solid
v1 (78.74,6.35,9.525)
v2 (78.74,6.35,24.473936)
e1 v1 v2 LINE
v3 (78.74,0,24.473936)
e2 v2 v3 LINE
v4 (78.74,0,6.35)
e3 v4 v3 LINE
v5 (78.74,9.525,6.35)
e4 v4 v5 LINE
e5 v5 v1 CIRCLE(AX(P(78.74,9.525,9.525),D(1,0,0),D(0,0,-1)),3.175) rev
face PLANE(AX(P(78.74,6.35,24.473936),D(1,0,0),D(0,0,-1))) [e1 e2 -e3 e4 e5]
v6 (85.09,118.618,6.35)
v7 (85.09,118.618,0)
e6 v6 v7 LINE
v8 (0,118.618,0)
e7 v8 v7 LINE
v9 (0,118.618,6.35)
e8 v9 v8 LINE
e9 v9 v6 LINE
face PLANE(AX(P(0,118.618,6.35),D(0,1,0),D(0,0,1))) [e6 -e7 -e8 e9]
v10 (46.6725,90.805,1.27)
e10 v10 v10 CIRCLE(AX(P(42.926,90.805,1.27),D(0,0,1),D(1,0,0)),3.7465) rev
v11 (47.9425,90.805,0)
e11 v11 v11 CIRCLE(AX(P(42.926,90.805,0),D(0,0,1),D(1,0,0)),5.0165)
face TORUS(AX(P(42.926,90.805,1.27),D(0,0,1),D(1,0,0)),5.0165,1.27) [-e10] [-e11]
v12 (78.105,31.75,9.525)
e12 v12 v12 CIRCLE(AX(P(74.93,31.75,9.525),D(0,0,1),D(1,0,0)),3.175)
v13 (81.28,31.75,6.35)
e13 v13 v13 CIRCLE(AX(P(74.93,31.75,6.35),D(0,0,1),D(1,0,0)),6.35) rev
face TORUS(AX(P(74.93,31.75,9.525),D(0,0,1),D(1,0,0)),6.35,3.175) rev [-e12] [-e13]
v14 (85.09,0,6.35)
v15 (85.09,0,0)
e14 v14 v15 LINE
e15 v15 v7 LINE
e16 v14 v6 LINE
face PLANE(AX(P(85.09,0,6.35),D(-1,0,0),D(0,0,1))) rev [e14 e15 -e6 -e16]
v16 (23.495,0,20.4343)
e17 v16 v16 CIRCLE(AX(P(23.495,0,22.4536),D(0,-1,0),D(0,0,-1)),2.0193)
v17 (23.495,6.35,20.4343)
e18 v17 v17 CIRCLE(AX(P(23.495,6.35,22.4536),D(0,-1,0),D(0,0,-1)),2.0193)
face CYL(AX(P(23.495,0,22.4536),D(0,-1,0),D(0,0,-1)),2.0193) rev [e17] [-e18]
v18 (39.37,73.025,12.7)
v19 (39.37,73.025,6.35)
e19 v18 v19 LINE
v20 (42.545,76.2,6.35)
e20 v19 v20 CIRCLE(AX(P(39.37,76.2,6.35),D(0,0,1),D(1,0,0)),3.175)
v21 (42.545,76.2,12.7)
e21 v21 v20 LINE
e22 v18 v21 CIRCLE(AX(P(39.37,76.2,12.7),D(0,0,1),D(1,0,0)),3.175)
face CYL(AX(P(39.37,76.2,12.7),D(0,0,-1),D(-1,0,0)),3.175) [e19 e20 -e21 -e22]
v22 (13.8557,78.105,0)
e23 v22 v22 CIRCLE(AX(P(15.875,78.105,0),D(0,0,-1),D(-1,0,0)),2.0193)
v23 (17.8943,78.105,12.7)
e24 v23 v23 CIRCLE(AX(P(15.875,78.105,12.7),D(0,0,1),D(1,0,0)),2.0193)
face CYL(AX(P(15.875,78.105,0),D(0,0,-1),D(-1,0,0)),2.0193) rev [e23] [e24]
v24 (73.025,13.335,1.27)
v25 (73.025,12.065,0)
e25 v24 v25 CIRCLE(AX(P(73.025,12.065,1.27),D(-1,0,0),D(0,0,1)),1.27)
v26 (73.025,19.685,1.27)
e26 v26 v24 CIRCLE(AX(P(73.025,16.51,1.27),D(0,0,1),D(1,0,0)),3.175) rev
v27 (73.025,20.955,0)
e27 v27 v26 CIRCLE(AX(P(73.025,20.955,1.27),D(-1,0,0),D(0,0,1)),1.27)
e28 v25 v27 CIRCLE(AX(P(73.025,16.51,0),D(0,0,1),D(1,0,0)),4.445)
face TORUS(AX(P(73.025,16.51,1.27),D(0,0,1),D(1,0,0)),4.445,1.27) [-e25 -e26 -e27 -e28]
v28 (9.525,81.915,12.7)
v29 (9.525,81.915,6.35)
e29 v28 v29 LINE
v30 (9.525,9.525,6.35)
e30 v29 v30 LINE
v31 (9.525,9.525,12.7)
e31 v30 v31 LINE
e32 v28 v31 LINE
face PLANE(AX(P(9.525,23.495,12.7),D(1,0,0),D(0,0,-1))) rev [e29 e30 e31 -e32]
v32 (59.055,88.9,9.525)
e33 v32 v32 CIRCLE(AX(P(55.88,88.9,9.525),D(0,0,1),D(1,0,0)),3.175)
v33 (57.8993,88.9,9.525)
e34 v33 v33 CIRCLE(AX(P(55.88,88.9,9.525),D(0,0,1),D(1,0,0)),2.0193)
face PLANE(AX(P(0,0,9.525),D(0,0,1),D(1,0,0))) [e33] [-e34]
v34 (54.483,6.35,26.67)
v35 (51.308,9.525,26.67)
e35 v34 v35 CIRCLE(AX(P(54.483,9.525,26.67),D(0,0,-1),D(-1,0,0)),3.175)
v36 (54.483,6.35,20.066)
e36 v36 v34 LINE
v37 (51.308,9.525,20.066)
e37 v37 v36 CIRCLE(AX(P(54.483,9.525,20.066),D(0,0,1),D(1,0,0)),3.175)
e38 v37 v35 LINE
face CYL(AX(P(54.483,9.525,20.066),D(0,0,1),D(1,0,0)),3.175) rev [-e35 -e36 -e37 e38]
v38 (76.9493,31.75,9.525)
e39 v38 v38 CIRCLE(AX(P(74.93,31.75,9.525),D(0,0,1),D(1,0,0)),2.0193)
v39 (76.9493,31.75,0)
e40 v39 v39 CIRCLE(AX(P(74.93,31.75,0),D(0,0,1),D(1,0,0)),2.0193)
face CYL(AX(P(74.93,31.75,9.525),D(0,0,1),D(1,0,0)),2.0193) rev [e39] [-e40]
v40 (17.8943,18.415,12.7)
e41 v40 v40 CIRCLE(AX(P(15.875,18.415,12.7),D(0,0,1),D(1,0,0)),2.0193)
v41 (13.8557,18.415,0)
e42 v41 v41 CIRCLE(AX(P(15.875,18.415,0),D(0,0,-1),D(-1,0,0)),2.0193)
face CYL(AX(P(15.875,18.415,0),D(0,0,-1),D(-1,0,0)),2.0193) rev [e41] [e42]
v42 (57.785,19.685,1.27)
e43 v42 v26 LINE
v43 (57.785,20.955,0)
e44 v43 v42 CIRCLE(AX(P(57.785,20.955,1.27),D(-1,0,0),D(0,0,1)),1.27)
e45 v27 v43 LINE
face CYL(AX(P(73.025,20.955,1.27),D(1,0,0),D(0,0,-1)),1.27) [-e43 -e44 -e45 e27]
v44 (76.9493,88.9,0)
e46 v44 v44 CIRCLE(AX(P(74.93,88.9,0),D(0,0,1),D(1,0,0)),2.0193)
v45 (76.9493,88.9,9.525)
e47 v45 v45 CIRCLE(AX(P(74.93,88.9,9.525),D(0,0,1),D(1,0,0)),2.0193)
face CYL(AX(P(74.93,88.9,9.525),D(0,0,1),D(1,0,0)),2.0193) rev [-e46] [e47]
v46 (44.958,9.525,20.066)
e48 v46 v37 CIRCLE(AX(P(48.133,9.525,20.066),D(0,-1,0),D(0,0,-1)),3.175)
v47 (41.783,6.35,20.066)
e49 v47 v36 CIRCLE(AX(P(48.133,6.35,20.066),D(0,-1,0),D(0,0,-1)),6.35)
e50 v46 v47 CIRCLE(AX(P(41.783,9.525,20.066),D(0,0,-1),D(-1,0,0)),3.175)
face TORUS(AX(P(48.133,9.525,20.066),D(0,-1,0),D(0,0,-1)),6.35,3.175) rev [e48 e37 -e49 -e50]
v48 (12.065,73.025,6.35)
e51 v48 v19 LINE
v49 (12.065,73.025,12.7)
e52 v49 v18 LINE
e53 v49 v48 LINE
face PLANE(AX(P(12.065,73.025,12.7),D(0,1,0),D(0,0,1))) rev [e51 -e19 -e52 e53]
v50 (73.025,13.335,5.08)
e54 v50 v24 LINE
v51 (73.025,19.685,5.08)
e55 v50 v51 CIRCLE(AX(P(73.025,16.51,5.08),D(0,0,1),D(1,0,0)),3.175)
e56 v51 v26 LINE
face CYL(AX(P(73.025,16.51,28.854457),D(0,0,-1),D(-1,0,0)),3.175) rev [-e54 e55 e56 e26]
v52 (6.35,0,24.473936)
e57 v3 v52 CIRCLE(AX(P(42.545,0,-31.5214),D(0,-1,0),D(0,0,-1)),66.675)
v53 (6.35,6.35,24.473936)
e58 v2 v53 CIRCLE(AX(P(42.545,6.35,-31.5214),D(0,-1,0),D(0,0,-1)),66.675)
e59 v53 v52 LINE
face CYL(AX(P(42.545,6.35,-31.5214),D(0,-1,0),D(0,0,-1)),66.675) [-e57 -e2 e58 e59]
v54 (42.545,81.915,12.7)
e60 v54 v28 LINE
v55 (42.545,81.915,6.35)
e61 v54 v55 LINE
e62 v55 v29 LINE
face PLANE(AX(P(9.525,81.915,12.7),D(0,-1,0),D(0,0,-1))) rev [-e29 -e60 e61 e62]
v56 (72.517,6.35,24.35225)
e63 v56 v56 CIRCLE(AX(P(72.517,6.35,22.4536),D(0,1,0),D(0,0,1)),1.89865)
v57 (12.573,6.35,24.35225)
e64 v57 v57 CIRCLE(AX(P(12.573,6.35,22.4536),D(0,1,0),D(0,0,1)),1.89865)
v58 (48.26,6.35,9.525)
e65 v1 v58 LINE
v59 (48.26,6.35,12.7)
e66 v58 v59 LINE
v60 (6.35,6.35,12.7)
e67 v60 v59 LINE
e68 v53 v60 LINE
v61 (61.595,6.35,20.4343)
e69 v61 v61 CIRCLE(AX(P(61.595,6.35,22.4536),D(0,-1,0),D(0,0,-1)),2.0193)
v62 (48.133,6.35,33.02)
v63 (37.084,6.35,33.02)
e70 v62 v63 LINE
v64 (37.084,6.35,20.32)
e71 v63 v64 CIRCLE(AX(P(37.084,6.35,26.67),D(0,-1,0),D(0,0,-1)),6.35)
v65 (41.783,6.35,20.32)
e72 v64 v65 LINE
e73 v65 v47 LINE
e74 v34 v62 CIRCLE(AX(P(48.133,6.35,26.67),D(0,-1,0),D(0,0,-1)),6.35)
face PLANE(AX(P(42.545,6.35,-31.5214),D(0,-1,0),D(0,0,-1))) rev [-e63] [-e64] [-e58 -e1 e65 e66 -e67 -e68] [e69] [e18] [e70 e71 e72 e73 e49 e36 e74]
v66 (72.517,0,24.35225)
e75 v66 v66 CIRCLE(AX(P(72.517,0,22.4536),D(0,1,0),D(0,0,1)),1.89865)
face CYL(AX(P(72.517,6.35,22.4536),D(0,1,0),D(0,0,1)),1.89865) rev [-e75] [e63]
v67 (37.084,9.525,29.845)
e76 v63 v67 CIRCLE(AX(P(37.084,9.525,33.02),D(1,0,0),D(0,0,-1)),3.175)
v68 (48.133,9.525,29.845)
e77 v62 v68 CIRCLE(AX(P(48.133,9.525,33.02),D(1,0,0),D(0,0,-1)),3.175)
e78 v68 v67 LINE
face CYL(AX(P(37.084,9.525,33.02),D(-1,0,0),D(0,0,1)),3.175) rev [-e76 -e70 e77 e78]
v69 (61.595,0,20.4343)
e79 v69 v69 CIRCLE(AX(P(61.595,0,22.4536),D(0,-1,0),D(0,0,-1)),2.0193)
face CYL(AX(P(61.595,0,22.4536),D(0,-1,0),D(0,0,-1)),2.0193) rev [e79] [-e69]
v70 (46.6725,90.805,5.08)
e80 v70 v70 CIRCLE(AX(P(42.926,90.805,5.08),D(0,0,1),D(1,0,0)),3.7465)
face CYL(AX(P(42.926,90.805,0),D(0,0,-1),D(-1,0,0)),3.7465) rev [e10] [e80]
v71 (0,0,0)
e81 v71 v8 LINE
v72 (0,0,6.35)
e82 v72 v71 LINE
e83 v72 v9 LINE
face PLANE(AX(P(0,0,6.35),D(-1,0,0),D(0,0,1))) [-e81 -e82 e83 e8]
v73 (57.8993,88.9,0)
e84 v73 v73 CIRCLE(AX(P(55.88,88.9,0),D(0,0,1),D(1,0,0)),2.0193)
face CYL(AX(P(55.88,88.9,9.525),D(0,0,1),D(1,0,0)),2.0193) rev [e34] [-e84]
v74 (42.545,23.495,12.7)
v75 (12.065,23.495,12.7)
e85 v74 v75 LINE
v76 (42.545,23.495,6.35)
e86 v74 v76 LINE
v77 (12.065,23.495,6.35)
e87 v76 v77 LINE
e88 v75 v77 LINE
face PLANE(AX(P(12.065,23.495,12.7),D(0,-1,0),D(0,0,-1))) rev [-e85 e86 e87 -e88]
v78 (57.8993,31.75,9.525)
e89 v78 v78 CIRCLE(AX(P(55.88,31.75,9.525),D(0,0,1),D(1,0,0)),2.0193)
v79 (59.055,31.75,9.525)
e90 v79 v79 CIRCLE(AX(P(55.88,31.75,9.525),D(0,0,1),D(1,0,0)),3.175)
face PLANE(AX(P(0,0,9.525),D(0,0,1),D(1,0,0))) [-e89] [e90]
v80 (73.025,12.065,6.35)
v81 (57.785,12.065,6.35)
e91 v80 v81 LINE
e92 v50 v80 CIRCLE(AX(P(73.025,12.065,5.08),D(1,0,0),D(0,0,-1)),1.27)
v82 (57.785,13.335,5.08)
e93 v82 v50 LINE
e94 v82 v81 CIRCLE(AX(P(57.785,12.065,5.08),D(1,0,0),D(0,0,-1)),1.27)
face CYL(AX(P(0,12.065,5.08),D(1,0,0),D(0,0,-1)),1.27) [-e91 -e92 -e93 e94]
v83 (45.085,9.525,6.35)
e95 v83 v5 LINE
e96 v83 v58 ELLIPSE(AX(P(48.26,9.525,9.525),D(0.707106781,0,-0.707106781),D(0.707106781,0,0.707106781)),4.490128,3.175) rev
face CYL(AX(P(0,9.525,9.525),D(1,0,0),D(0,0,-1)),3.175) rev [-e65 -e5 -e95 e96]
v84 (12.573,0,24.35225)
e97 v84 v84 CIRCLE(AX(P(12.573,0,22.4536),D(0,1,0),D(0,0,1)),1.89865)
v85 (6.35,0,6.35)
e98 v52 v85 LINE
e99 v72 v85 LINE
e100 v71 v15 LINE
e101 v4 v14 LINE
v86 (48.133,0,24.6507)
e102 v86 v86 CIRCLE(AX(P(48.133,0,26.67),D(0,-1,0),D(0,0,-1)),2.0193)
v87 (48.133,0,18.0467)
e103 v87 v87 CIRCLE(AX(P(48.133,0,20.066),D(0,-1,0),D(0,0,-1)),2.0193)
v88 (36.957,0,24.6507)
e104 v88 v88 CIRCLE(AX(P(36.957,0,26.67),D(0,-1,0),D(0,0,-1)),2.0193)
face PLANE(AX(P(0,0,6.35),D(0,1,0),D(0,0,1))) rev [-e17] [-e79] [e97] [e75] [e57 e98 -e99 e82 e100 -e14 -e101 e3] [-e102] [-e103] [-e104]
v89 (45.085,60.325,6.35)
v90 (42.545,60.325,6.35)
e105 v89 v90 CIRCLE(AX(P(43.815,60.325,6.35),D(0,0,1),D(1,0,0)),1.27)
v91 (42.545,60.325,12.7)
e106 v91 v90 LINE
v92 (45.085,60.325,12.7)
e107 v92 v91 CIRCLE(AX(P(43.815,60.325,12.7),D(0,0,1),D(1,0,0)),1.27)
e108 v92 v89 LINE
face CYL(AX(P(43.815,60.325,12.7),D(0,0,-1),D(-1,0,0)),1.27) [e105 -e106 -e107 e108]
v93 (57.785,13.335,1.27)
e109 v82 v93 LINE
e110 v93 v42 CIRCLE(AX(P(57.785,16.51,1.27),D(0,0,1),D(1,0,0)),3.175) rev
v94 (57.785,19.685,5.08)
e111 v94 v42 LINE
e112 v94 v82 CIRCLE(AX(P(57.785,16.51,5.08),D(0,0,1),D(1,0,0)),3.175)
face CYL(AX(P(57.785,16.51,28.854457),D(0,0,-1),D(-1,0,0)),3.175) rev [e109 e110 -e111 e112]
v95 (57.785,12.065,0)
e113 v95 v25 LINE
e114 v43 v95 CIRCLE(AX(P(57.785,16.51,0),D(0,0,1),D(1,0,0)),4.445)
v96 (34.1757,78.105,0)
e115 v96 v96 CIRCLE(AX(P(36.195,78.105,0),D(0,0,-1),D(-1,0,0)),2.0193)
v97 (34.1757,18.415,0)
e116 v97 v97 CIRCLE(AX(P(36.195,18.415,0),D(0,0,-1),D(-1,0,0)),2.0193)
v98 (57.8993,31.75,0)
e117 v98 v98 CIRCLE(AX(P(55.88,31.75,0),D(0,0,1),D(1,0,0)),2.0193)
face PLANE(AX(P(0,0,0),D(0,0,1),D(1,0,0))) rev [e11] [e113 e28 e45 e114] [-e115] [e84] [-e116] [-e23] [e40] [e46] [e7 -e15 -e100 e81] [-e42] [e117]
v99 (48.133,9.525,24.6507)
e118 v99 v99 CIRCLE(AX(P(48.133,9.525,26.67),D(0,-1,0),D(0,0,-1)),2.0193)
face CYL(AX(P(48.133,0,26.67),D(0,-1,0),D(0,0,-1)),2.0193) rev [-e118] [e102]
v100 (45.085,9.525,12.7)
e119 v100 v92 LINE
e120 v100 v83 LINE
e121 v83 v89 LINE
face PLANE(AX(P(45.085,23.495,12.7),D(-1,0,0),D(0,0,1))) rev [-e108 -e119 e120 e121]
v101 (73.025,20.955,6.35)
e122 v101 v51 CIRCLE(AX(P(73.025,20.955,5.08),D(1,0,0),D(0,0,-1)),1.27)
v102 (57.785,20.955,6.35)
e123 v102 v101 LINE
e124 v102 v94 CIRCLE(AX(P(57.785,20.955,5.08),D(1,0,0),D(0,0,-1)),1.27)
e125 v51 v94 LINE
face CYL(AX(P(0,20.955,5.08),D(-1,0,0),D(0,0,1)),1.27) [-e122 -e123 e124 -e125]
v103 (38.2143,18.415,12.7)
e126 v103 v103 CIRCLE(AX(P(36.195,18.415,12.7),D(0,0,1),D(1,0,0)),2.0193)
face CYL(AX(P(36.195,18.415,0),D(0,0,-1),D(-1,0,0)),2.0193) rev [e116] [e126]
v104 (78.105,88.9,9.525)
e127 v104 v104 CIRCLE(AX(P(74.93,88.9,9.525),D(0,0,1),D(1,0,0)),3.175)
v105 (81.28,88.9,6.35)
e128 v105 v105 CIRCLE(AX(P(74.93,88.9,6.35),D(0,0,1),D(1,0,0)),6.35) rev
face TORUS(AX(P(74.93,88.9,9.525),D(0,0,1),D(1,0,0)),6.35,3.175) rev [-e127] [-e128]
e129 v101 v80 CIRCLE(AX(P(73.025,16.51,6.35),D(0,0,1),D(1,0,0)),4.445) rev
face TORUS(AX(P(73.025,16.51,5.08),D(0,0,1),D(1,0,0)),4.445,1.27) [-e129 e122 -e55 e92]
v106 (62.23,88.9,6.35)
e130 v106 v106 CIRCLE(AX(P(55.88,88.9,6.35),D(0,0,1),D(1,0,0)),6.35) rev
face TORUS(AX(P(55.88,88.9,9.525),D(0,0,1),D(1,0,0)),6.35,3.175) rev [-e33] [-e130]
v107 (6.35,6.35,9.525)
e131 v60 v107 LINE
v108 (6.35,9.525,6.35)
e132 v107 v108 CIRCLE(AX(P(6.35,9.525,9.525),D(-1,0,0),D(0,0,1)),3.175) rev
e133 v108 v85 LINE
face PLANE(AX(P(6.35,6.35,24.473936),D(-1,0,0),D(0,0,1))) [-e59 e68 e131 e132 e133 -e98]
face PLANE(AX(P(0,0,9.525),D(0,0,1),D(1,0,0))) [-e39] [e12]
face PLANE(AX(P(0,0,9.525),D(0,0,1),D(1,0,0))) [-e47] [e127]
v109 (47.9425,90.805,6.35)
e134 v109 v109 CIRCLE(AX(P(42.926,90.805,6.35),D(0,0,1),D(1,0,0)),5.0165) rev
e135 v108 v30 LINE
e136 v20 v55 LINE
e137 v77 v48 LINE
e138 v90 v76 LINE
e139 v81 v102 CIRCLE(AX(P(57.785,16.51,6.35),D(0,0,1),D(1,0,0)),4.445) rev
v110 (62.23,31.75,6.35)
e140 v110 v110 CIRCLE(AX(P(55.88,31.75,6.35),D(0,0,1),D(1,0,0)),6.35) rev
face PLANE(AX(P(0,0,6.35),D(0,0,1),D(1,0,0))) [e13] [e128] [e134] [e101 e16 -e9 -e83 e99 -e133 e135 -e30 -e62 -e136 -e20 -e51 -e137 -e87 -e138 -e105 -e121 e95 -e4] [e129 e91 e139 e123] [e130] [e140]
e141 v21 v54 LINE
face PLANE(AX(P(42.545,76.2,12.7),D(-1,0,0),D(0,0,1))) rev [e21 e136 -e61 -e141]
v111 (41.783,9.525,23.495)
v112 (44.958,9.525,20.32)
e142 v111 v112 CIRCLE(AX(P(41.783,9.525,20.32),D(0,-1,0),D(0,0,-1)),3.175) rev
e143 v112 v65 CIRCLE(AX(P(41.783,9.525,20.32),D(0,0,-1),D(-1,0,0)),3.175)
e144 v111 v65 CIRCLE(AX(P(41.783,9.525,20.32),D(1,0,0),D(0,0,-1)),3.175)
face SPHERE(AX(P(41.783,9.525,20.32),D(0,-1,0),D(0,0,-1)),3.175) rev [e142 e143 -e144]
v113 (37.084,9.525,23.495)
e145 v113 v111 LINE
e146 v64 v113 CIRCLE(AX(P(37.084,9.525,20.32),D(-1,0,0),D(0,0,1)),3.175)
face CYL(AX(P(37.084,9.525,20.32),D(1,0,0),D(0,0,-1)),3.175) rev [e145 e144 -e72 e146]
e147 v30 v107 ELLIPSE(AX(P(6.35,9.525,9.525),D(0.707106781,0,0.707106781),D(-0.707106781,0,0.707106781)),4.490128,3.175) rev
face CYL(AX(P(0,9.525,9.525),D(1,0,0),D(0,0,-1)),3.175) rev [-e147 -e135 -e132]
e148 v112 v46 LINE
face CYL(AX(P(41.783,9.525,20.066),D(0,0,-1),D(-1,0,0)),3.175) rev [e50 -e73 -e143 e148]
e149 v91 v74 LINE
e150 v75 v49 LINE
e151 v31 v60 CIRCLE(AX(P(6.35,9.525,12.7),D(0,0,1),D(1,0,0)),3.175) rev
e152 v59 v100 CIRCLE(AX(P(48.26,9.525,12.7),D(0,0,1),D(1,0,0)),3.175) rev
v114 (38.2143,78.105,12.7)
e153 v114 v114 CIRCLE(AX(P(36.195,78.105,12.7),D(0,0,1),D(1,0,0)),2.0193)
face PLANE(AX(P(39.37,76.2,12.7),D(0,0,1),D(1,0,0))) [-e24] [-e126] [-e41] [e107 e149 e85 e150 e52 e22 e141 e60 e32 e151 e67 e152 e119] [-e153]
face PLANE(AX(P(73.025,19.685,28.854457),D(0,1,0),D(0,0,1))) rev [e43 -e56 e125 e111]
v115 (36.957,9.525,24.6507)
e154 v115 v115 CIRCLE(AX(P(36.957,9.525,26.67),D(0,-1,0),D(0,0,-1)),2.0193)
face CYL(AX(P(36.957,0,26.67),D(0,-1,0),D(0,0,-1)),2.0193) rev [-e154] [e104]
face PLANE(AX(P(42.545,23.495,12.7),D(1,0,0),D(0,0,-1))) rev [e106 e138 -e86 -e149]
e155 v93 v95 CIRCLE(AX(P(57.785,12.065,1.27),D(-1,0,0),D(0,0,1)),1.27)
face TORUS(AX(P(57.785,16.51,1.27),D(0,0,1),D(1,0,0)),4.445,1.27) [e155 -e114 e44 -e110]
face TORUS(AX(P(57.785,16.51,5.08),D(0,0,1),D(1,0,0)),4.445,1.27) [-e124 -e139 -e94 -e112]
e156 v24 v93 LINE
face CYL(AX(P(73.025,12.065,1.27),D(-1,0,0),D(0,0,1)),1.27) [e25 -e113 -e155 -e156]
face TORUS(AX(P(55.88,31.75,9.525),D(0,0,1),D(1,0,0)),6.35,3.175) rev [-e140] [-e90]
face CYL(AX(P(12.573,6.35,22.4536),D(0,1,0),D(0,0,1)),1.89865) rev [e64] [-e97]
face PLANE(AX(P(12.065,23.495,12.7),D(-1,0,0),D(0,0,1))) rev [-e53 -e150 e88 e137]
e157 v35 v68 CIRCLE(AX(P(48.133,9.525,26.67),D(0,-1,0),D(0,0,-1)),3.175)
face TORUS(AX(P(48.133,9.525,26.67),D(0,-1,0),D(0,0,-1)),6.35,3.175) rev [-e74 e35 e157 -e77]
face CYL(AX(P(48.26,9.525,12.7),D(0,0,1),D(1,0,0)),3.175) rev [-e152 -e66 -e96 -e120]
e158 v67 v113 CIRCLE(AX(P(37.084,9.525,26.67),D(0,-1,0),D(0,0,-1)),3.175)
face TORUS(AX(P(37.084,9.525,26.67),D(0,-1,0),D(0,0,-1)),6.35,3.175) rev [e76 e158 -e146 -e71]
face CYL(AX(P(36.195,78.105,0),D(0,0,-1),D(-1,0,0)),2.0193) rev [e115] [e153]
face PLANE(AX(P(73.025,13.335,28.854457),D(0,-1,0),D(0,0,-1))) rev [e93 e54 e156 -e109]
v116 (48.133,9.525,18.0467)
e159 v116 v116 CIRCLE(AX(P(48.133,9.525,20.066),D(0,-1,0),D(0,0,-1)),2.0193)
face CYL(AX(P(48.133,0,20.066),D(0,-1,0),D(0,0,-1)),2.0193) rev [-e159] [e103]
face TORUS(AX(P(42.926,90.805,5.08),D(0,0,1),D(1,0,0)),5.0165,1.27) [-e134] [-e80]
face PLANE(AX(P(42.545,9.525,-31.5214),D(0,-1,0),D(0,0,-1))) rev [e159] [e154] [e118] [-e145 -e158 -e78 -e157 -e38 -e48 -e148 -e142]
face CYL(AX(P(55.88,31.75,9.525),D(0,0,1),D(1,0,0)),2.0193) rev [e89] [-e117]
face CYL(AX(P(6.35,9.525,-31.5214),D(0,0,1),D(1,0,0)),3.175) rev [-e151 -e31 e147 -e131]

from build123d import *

# Parameters (mm, degrees)
SKETCH1_W                         = 85.09
SKETCH1_H                         = 118.618
BOSS1_MAIN_PLATE_DEPTH            = 6.35
BOSS2_BOTTOM_PLATE_DEPTH          = 6.35
BOSS3_BATTERY_PLATE_DEPTH         = 6.35
FILLET1_BOTTOM_PLATE_R            = 3.175
HOLES1_CB_MAIN_PLATE_D            = 4.0386
HOLES2_MAIN_PLATE_D               = 7.493
CUT1_MAIN_PLATE_DEPTH             = 6.35
FILLET2_MAIN_PLATE_HOLES_R        = 1.27
HOLES3_BOTTOM_PLATE_D             = 4.0386
SKETCH14_R                        = 3.175
BOSS4_MAIN_PLATE_STANDOFF_DEPTH   = 3.175
HOLES5_MAIN_PLATE_D               = 4.0386
FILLET3_MAIN_PLATE_STANDOFF_R     = 3.175
BOSS5_BOTTOM_PLATE_STANDOFF_DEPTH = 3.175
FILLET4_BOTTOM_PLATE_STANDOFF_R   = 3.175
HOLES6_BOTTOM_PLATE_D             = 4.0386
HOLES7_D                          = 3.7973


with BuildPart() as part:
    # Sketch1 → Boss1 - Main Plate (new body)
    with BuildSketch(Plane.XY):
        with Locations((42.545, 59.309)):
            Rectangle(SKETCH1_W, SKETCH1_H)
    extrude(amount=BOSS1_MAIN_PLATE_DEPTH)

    # Sketch3 → Boss2 - Bottom Plate (add)
    with BuildSketch(Plane.XZ):
        with BuildLine():
            Line((6.35, 24.47393552), (6.35, 0))
            Line((6.35, 0), (78.74, 0))
            Line((78.74, 0), (78.74, 24.47393552))
            ThreePointArc((78.74, 24.47393552), (42.545, 35.1536), (6.35, 24.47393552))
        make_face()
    extrude(amount=-BOSS2_BOTTOM_PLATE_DEPTH)

    # Sketch4 → Boss3 - Battery Plate (add)
    with BuildSketch(Plane.XY.offset(6.35)):
        with BuildLine():
            Line((9.525, 6.35), (45.085, 6.35))
            Line((45.085, 6.35), (45.085, 23.495))
            Line((45.085, 23.495), (45.085, 60.325))
            ThreePointArc((45.085, 60.325), (43.815, 61.595), (42.545, 60.325))
            Line((42.545, 60.325), (42.545, 23.495))
            Line((42.545, 23.495), (12.065, 23.495))
            Line((12.065, 23.495), (12.065, 73.025))
            Line((12.065, 73.025), (39.37, 73.025))
            ThreePointArc((39.37, 73.025), (41.61506403, 73.95493597), (42.545, 76.2))
            Line((42.545, 76.2), (42.545, 81.915))
            Line((42.545, 81.915), (9.525, 81.915))
            Line((9.525, 81.915), (9.525, 73.025))
            Line((9.525, 73.025), (9.525, 23.495))
            Line((9.525, 23.495), (9.525, 6.35))
        make_face()
    extrude(amount=BOSS3_BATTERY_PLATE_DEPTH)

    # Fillet1 - Bottom Plate
    fillet1_bottom_plate_edges = [part.edges().sort_by_distance(p)[0] for p in [
        (7.9375, 6.35, 6.35),
        (61.9125, 6.35, 6.35),
        (9.525, 6.35, 9.525),
        (45.085, 6.35, 9.525),
    ]]
    fillet(fillet1_bottom_plate_edges, radius=FILLET1_BOTTOM_PLATE_R - 0.0001)  # a hair under: the kernel refuses the full size

    # Holes1 - CB Main Plate (through all)
    with Locations(Plane(origin=(0, 0, 0), x_dir=(-1, 0, 0), z_dir=(0, 0, -1))):
        with Locations((-36.195, 78.105), (-15.875, 78.105), (-15.875, 18.415), (-36.195, 18.415)):
            Hole(HOLES1_CB_MAIN_PLATE_D / 2)

    # Holes2 - Main Plate (through all)
    with Locations(Plane(origin=(0, 0, 0), x_dir=(-1, 0, 0), z_dir=(0, 0, -1))):
        with Locations((-42.926, 90.805)):
            Hole(HOLES2_MAIN_PLATE_D / 2)

    # Sketch10 → Cut1 - Main Plate (cut)
    with BuildSketch(Plane(origin=(0, 0, 0), x_dir=(-1, 0, 0), z_dir=(0, 0, -1))):
        with BuildLine():
            Line((-73.025, 13.335), (-57.785, 13.335))
            ThreePointArc((-57.785, 13.335), (-54.61, 16.51), (-57.785, 19.685))
            Line((-57.785, 19.685), (-73.025, 19.685))
            ThreePointArc((-73.025, 19.685), (-76.2, 16.51), (-73.025, 13.335))
        make_face()
    extrude(amount=-CUT1_MAIN_PLATE_DEPTH, mode=Mode.SUBTRACT)

    # Fillet2 - Main Plate Holes
    fillet2_main_plate_holes_edges = [part.edges().sort_by_distance(p)[0] for p in [
        (39.1795, 90.805, 6.35),
        (39.1795, 90.805, 0),
        (76.2, 16.51, 0),
        (65.405, 13.335, 0),
        (54.61, 16.51, 0),
        (65.405, 19.685, 0),
        (65.405, 13.335, 6.35),
        (54.61, 16.51, 6.35),
        (65.405, 19.685, 6.35),
        (76.2, 16.51, 6.35),
    ]]
    fillet(fillet2_main_plate_holes_edges, radius=FILLET2_MAIN_PLATE_HOLES_R)

    # Holes3 - Bottom Plate (through all)
    with Locations(Plane(origin=(0, 0, 0), x_dir=(-1, 0, 0), z_dir=(0, -1, 0))):
        with Locations((-23.495, -22.4536), (-61.595, -22.4536)):
            Hole(HOLES3_BOTTOM_PLATE_D / 2)

    # Sketch14 → Boss4 - Main Plate Standoff (add)
    with BuildSketch(Plane.XY.offset(6.35)):
        with Locations((55.88, 88.9)):
            Circle(SKETCH14_R)
        with Locations((74.93, 88.9)):
            Circle(SKETCH14_R)
        with Locations((55.88, 31.75)):
            Circle(SKETCH14_R)
        with Locations((74.93, 31.75)):
            Circle(SKETCH14_R)
    extrude(amount=BOSS4_MAIN_PLATE_STANDOFF_DEPTH)

    # Holes5 - Main Plate (through all)
    with Locations(Plane.XY.offset(9.525)):
        with Locations((55.88, 88.9), (74.93, 88.9), (55.88, 31.75), (74.93, 31.75)):
            Hole(HOLES5_MAIN_PLATE_D / 2)

    # Fillet3 - Main Plate Standoff
    fillet3_main_plate_standoff_edges = [part.edges().sort_by_distance(p)[0] for p in [
        (52.705, 88.9, 6.35),
        (71.755, 88.9, 6.35),
        (52.705, 31.75, 6.35),
        (71.755, 31.75, 6.35),
    ]]
    fillet(fillet3_main_plate_standoff_edges, radius=FILLET3_MAIN_PLATE_STANDOFF_R - 0.0001)  # a hair under: the kernel refuses the full size

    # Sketch21 → Boss5 - Bottom Plate Standoff (add)
    with BuildSketch(Plane(origin=(0, 6.35, 0), x_dir=(1, 0, 0), z_dir=(0, 1, 0))):
        with BuildLine():
            Line((37.084, -23.495), (41.783, -23.495))
            ThreePointArc((41.783, -23.495), (44.02806403, -22.56506403), (44.958, -20.32))
            Line((44.958, -20.32), (44.958, -20.066))
            ThreePointArc((44.958, -20.066), (48.133, -16.891), (51.308, -20.066))
            Line((51.308, -20.066), (51.308, -26.67))
            ThreePointArc((51.308, -26.67), (50.37806403, -28.91506403), (48.133, -29.845))
            Line((48.133, -29.845), (37.084, -29.845))
            ThreePointArc((37.084, -29.845), (33.909, -26.67), (37.084, -23.495))
        make_face()
    extrude(amount=BOSS5_BOTTOM_PLATE_STANDOFF_DEPTH)

    # Fillet4 - Bottom Plate Standoff
    fillet4_bottom_plate_standoff_edges = [part.edges().sort_by_distance(p)[0] for p in [
        (39.4335, 6.35, 23.495),
        (44.02806403, 6.35, 22.56506403),
        (44.958, 6.35, 20.193),
        (48.133, 6.35, 16.891),
        (51.308, 6.35, 23.368),
        (50.37806403, 6.35, 28.91506403),
        (33.909, 6.35, 26.67),
        (42.6085, 6.35, 29.845),
    ]]
    fillet(fillet4_bottom_plate_standoff_edges, radius=FILLET4_BOTTOM_PLATE_STANDOFF_R - 0.0001)  # a hair under: the kernel refuses the full size

    # Holes6 - Bottom Plate (through all)
    with Locations(Plane(origin=(0, 0, 0), x_dir=(-1, 0, 0), z_dir=(0, -1, 0))):
        with Locations((-36.957, -26.67), (-48.133, -26.67), (-48.133, -20.066)):
            Hole(HOLES6_BOTTOM_PLATE_D / 2)

    # Holes7 (through all)
    with Locations(Plane(origin=(0, 6.35, 0), x_dir=(1, 0, 0), z_dir=(0, 1, 0))):
        with Locations((72.517, -22.4536), (12.573, -22.4536)):
            Hole(HOLES7_D / 2)


solid = part.part
